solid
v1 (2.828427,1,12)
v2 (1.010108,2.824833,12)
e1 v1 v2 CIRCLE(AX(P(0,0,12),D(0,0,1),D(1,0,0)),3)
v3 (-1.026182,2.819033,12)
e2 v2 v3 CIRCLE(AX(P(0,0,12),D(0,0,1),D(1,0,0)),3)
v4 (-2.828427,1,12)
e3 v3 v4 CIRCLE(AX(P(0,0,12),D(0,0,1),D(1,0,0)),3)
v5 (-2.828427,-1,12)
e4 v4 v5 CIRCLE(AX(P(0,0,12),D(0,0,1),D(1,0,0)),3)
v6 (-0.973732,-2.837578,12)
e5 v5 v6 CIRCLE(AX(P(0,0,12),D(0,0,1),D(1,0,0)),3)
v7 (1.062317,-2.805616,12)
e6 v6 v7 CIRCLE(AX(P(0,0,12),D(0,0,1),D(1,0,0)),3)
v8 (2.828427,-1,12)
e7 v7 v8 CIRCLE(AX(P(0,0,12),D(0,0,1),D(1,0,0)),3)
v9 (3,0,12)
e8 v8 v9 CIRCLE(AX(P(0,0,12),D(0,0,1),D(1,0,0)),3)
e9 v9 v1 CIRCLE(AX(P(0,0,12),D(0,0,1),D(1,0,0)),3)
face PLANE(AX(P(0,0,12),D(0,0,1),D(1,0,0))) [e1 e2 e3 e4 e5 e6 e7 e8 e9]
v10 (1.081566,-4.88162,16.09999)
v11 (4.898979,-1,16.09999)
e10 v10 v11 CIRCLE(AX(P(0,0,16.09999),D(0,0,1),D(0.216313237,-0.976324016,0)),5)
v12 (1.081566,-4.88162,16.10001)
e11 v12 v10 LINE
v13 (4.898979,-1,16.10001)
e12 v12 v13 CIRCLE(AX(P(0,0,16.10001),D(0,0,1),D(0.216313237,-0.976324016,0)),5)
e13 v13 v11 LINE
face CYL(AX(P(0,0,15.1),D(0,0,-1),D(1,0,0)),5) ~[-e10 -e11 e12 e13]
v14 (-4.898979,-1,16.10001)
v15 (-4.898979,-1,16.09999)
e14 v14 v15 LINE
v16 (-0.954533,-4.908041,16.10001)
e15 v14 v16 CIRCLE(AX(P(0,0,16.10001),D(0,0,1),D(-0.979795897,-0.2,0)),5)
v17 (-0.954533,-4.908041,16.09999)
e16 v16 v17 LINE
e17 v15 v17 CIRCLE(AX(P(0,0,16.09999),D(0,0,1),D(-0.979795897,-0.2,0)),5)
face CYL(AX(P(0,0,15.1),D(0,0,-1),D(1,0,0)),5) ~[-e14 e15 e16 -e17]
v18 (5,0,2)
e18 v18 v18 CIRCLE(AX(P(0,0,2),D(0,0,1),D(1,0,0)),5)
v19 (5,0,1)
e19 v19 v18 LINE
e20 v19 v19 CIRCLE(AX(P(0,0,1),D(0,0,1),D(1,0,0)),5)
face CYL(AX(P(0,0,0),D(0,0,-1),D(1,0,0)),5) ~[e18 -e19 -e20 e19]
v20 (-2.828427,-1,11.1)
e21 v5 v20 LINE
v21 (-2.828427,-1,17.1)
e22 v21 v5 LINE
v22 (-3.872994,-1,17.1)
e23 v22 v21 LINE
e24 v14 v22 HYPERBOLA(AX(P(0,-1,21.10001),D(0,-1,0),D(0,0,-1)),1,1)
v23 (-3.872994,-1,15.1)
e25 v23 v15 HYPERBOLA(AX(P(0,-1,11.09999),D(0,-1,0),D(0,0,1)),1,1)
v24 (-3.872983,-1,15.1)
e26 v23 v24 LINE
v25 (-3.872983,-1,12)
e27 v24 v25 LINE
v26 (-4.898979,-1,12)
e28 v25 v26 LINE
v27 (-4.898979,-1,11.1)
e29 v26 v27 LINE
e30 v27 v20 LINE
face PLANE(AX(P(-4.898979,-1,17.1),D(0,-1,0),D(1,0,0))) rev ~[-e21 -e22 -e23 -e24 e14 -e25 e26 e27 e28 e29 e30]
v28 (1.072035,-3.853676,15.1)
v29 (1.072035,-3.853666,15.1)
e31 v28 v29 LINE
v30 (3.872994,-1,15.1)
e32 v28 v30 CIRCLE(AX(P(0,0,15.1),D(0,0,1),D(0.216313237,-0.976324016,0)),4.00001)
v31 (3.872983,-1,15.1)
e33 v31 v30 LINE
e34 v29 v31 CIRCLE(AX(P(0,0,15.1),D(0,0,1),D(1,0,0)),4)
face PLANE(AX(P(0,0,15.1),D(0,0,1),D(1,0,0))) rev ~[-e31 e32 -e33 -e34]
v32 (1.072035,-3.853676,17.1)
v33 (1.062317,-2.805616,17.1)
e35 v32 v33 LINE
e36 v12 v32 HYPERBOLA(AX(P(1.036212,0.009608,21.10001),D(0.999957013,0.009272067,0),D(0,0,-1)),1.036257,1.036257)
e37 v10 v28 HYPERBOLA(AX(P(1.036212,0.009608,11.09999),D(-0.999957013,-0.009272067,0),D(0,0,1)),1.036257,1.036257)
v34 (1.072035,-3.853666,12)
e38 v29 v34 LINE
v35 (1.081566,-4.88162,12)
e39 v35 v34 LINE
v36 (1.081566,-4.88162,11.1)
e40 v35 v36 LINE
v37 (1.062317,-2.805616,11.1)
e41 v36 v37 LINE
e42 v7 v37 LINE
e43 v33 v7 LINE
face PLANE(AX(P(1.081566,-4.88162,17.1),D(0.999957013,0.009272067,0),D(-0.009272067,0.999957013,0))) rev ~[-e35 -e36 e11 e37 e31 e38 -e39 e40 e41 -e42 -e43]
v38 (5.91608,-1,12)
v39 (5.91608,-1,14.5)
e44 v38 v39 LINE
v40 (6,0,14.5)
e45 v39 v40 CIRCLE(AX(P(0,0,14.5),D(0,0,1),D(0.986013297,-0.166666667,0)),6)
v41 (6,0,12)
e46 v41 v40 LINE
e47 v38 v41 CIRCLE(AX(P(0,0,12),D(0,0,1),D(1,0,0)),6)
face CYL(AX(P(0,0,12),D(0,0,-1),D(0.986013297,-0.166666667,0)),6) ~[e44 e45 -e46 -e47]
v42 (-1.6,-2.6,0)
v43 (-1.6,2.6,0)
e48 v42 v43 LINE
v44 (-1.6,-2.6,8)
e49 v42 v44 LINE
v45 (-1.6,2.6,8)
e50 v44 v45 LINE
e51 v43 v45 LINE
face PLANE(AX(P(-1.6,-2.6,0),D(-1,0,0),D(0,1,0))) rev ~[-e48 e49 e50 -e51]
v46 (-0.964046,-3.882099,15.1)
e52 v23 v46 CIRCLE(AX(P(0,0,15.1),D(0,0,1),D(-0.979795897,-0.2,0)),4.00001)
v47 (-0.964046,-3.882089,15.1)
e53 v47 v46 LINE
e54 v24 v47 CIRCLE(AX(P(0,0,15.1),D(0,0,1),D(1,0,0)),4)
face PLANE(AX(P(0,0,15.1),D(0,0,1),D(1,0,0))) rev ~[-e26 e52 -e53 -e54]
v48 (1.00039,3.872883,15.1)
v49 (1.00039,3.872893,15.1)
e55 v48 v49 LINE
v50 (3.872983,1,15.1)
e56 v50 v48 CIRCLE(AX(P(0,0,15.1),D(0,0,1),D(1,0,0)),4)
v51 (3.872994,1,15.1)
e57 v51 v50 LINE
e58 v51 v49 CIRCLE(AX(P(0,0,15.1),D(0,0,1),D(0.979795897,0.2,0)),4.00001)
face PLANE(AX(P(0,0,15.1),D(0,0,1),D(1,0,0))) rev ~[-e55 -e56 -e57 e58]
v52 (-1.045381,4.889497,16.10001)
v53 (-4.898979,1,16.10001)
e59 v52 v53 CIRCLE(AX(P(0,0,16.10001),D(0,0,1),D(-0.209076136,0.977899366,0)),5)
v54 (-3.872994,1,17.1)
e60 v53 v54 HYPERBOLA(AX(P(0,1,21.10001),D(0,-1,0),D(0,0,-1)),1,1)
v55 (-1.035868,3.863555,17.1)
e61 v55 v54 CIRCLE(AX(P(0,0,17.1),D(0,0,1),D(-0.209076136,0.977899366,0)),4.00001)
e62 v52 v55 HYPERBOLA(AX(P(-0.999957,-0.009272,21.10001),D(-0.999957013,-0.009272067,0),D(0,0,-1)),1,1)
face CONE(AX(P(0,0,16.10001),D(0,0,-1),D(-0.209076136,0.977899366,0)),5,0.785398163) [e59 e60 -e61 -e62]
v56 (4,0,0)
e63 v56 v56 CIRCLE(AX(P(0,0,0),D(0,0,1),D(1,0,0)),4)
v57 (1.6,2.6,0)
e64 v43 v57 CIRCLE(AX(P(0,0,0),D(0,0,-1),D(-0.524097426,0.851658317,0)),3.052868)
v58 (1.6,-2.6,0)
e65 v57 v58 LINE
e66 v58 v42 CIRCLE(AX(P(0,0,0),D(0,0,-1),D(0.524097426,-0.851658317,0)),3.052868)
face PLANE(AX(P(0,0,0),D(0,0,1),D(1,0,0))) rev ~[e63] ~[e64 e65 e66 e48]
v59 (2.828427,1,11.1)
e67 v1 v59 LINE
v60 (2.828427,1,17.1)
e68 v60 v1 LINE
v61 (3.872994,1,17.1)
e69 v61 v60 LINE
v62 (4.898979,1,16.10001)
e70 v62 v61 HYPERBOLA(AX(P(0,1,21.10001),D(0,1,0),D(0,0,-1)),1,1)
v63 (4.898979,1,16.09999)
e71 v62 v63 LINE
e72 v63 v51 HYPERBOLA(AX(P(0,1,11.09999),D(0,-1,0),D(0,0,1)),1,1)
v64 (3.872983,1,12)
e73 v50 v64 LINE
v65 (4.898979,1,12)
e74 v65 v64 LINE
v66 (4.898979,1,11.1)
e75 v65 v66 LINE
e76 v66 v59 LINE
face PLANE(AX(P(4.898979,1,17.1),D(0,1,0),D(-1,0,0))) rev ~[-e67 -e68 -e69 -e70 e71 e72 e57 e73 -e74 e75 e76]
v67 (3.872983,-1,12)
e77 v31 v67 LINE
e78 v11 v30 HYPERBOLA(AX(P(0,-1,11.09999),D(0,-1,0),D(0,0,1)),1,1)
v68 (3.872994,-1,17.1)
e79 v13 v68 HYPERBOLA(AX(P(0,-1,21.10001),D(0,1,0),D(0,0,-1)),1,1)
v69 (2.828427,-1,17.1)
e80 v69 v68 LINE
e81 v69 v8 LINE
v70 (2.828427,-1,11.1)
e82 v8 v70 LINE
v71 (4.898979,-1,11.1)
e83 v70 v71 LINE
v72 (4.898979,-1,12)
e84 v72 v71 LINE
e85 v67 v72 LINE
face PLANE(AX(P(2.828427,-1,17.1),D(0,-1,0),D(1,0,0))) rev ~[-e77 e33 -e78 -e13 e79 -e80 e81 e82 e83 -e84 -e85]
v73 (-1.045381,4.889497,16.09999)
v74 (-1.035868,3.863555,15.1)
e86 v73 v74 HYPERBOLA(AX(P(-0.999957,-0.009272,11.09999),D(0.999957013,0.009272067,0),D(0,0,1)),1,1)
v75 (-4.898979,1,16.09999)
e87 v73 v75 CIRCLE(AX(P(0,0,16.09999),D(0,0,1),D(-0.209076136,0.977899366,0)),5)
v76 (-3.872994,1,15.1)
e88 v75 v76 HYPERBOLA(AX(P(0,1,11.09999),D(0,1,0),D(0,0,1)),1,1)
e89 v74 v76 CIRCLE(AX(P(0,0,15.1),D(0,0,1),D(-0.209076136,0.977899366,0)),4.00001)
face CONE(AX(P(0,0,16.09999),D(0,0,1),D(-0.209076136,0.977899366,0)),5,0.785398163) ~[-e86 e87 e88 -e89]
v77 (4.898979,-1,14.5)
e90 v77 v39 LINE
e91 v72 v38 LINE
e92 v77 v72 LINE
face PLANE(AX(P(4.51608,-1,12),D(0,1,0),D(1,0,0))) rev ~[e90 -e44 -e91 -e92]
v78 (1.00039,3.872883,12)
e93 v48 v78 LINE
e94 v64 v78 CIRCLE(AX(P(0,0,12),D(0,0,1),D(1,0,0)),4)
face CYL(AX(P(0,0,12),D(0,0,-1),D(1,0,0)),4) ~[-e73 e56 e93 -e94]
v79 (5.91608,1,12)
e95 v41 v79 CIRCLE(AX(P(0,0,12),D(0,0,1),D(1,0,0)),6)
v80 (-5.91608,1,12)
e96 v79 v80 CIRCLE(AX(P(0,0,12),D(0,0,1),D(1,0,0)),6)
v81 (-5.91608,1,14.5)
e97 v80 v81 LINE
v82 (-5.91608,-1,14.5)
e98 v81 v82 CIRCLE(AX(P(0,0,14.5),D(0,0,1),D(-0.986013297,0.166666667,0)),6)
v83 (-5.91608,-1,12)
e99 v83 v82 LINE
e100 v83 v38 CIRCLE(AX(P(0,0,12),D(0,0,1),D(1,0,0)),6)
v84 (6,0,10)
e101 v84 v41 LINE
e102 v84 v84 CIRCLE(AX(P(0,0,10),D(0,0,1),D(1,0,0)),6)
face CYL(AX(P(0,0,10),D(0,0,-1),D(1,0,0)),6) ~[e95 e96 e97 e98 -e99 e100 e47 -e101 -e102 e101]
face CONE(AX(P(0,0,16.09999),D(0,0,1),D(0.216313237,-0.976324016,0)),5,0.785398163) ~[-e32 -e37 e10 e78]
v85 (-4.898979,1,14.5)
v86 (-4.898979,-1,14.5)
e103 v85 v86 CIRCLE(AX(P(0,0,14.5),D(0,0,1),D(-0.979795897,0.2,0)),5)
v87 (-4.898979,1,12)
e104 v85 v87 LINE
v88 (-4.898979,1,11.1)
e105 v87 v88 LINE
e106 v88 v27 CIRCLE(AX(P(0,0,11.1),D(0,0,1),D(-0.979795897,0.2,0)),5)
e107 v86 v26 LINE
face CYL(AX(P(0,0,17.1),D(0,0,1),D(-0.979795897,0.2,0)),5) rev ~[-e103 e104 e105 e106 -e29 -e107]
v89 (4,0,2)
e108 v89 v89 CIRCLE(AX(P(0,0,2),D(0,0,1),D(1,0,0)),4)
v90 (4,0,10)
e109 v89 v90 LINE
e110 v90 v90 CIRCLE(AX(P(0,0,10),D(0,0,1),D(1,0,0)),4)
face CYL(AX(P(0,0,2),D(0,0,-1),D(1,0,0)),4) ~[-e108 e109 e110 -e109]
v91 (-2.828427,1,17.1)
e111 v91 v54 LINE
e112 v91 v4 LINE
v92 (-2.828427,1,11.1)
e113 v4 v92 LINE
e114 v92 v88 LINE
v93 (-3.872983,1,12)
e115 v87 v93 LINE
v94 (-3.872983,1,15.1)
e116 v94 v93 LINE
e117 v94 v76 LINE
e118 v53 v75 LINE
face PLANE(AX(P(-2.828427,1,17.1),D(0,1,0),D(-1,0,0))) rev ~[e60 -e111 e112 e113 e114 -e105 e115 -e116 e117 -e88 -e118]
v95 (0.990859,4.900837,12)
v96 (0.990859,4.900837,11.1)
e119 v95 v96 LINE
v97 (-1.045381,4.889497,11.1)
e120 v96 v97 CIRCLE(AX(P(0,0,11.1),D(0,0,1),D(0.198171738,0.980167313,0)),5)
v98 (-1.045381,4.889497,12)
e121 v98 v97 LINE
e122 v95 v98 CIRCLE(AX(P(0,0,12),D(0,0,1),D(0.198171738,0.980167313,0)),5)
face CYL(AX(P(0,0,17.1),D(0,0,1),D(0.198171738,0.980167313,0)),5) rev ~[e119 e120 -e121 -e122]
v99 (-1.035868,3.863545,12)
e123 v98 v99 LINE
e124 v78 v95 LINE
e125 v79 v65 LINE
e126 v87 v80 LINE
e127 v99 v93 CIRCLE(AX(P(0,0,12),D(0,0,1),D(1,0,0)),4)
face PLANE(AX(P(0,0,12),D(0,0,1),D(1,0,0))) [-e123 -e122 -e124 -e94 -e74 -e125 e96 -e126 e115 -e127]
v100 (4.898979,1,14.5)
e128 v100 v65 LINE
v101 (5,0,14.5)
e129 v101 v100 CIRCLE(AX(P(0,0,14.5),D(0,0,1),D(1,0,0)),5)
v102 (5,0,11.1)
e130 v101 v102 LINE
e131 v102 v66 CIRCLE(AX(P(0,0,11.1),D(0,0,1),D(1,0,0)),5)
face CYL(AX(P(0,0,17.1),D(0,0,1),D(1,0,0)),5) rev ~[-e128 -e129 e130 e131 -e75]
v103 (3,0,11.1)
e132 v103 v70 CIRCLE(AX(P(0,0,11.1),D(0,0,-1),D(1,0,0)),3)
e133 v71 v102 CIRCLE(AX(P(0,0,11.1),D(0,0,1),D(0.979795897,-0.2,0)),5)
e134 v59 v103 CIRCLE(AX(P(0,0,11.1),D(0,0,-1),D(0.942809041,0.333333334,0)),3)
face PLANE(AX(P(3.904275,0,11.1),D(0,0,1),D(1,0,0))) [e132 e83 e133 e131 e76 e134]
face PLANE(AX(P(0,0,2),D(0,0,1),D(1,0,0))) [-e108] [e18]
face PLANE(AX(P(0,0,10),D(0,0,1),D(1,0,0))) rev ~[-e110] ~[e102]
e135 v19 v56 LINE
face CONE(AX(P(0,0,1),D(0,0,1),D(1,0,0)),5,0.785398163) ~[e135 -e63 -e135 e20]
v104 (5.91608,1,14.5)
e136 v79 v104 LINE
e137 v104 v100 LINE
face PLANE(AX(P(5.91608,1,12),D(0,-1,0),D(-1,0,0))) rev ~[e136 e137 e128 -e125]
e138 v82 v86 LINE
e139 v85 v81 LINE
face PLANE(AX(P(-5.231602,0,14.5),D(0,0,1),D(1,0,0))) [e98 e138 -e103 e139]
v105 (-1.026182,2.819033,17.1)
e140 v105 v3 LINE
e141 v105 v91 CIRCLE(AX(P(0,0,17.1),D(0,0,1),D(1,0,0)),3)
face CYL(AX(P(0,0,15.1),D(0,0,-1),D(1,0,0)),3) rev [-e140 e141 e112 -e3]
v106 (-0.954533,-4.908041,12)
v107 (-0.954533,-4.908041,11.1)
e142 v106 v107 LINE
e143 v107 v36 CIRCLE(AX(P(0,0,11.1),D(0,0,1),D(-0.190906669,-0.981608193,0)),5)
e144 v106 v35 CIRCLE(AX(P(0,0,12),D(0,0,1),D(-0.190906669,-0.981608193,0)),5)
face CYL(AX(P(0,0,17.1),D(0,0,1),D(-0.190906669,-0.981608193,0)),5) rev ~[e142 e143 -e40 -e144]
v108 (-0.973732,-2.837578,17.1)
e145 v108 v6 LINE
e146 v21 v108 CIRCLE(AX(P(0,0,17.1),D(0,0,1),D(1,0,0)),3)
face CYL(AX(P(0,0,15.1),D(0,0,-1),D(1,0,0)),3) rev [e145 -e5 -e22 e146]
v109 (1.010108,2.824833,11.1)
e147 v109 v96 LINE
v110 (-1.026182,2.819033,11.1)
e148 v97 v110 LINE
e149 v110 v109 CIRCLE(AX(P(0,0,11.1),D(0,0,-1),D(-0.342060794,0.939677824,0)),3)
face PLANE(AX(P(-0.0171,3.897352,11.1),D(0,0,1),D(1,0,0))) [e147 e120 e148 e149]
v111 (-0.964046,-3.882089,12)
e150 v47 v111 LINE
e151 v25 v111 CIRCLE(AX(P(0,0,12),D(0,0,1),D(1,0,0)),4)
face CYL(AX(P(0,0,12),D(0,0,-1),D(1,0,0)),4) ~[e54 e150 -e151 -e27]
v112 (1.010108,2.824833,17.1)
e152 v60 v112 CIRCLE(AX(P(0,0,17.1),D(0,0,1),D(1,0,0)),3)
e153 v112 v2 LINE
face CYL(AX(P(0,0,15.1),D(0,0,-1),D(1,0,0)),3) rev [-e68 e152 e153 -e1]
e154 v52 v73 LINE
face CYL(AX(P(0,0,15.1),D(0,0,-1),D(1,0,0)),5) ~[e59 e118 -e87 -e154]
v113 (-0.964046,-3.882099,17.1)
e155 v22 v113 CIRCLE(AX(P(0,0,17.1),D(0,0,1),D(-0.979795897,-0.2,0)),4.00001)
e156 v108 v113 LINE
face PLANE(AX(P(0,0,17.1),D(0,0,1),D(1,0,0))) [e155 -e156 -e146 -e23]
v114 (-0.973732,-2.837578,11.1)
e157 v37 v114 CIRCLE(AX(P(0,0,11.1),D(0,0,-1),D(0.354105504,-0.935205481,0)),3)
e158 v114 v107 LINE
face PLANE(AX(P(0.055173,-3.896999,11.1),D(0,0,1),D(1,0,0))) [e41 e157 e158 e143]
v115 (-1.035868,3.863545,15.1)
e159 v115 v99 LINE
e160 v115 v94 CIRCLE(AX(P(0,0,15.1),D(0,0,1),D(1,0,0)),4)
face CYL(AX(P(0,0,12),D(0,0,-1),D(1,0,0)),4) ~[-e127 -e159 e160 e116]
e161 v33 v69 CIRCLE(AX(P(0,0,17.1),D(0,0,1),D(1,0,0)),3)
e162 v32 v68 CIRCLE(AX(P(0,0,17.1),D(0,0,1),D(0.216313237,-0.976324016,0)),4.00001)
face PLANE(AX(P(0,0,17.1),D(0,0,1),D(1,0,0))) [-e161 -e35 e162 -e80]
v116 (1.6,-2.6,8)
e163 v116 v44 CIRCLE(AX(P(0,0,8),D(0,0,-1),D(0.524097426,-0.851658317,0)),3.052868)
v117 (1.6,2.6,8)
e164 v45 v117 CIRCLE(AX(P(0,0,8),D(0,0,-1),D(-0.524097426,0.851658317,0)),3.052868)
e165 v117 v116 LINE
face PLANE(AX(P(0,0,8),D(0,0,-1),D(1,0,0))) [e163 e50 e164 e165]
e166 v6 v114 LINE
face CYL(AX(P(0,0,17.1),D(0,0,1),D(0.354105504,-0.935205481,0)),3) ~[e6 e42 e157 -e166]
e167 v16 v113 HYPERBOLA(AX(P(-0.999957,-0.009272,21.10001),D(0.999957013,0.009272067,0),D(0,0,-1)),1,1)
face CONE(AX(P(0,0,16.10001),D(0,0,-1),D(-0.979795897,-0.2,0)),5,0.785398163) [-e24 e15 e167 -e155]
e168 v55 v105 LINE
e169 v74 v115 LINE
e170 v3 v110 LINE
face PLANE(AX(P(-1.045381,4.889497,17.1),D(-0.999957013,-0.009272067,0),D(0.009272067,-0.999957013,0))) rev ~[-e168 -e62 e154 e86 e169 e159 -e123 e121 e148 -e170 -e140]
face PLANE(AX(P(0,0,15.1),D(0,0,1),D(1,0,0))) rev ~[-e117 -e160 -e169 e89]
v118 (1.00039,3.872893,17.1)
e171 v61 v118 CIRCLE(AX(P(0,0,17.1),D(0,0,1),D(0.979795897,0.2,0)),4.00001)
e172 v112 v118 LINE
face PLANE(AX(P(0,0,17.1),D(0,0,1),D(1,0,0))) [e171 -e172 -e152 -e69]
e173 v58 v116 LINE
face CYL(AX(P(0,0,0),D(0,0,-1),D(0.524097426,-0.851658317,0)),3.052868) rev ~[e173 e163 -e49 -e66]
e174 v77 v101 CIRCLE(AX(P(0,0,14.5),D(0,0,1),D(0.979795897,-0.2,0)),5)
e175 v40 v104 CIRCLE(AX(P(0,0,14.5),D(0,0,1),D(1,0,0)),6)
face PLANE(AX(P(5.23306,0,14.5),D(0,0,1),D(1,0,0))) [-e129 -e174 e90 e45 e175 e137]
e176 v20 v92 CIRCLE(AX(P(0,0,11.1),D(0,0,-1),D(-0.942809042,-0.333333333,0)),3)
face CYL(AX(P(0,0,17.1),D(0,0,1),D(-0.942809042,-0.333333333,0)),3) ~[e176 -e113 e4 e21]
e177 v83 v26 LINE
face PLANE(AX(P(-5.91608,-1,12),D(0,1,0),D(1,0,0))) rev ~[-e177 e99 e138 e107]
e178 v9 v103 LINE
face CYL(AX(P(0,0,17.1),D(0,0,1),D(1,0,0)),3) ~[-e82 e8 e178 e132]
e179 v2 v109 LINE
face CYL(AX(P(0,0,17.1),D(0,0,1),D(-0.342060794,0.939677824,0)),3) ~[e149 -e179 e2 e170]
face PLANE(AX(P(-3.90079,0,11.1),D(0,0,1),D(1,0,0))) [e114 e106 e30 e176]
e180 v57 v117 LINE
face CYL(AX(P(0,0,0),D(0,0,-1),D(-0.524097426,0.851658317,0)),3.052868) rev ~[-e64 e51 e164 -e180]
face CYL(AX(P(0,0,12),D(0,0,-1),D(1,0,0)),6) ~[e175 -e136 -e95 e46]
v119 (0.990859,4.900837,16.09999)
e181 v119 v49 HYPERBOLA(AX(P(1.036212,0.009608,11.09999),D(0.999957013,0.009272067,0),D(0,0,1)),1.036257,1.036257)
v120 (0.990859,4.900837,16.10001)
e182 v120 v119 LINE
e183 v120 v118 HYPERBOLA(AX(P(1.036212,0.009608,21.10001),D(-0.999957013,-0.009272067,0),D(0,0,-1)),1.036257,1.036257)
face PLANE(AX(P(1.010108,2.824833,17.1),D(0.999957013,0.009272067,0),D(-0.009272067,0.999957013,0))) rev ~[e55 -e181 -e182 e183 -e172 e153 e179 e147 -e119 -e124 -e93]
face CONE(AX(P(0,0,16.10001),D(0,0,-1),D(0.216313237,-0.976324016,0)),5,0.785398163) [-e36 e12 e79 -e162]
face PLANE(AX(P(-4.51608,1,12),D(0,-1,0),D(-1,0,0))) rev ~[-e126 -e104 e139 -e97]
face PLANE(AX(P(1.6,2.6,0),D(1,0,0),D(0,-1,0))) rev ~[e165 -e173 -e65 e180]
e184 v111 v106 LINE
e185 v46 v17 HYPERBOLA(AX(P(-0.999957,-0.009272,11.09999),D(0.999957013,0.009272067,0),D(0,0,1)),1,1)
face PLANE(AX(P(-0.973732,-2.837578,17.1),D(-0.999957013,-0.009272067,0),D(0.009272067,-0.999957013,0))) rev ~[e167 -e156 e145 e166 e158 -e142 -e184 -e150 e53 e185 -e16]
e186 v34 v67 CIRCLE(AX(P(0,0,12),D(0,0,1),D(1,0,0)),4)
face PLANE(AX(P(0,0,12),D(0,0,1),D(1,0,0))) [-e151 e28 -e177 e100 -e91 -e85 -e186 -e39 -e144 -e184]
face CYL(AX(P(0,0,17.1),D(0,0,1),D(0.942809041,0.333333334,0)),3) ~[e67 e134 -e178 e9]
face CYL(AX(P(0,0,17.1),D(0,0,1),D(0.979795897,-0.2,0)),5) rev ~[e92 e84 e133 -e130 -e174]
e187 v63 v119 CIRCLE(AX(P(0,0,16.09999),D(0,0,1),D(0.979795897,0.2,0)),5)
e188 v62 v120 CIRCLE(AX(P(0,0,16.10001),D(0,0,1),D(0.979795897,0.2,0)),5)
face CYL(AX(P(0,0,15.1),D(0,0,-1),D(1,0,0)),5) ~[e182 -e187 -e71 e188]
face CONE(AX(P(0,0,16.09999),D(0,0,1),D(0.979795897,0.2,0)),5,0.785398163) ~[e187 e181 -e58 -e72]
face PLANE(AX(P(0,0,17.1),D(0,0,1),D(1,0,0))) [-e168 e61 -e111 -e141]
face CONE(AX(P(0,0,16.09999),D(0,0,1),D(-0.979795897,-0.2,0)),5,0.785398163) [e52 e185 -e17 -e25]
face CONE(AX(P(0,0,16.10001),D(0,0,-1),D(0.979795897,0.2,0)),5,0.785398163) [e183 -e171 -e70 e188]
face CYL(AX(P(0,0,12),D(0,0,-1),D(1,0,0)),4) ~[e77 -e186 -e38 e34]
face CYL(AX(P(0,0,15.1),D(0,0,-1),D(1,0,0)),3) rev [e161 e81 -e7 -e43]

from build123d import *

# Parameters (mm, degrees)
F0_R      = 5
F1_DEPTH  = 2
F2_R      = 4
F3_DEPTH  = 8
F4_R      = 6
F5_DEPTH  = 2
F7_DEPTH  = 2.5
F10_DEPTH = 8
F11_SIZE  = 1
F8_R      = 4
F8_R_2    = 3
F12_DEPTH = 3.1
F13_R     = 5
F13_R_2   = 4
F13_R_3   = 3
F14_DEPTH = 2
F16_DEPTH = 6
F17_SIZE  = 0.99999


# Not quite as in the source:
# - a fillet or chamfer is up to 0.001 mm smaller than in the source, because OpenCascade refuses the exact size


with BuildPart() as f1:
    # F0 (on Top) → F1 (new body)
    with BuildSketch(Plane.XY):
        Circle(F0_R)
    extrude(amount=F1_DEPTH)

    # F2 (on face) → F3 (join)
    with BuildSketch(Plane.XY.offset(2)):
        Circle(F2_R)
    extrude(amount=F3_DEPTH)

    # F4 (on face) → F5 (join)
    with BuildSketch(Plane.XY.offset(10)):
        Circle(F4_R)
    extrude(amount=F5_DEPTH)

    # F6 (on face) → F7 (join)
    with BuildSketch(Plane.XY.offset(12)):
        with BuildLine():
            ThreePointArc((6, 0), (5.9789831367, 0.5017575617), (5.9160797831, 1))
            Line((5.9160797831, 1), (4.5160797831, 1))
            Line((4.5160797831, 1), (4.5160797831, -1))
            Line((4.5160797831, -1), (5.9160797831, -1))
            ThreePointArc((5.9160797831, -1), (5.9789831367, -0.5017575617), (6, 0))
        make_face()
        with BuildLine():
            Line((-4.5160797831, 1), (-5.9160797831, 1))
            ThreePointArc((-5.9160797831, 1), (-6, 0), (-5.9160797831, -1))
            Line((-5.9160797831, -1), (-4.5160797831, -1))
            Line((-4.5160797831, -1), (-4.5160797831, 1))
        make_face()
    extrude(amount=F7_DEPTH)

    # F9 (on face) → F10 (cut)
    with BuildSketch(Plane(origin=(0, 0, 0), x_dir=(1, 0, 0), z_dir=(0, 0, -1))):
        with BuildLine():
            ThreePointArc((1.6, 2.6), (0, 3.0528675045), (-1.6, 2.6))
            Line((-1.6, 2.6), (-1.6, -2.6))
            ThreePointArc((-1.6, -2.6), (0, -3.0528675045), (1.6, -2.6))
            Line((1.6, -2.6), (1.6, 2.6))
        make_face()
    extrude(amount=-F10_DEPTH, mode=Mode.SUBTRACT)

    # F11
    f11_edges = [f1.edges().sort_by_distance(p)[0] for p in [
        (-5, 0, 0),
    ]]
    chamfer(f11_edges, length=F11_SIZE)

    # F8 (on face) → F12 (join)
    with BuildSketch(Plane.XY.offset(12)):
        Circle(F8_R)
        Circle(F8_R_2, mode=Mode.SUBTRACT)
    extrude(amount=F12_DEPTH)

    # F13 (on face) → F14 (join)
    with BuildSketch(Plane.XY.offset(15.1)):
        Circle(F13_R)
        Circle(F13_R_2, mode=Mode.SUBTRACT)
        Circle(F13_R_2)
        Circle(F13_R_3, mode=Mode.SUBTRACT)
    extrude(amount=F14_DEPTH)

    # F15 (on face) → F16 (cut)
    with BuildSketch(Plane.XY.offset(17.1)):
        with BuildLine():
            Line((-2.8284271247, 1), (-4.8989794856, 1))
            ThreePointArc((-4.8989794856, 1), (-5, 0), (-4.8989794856, -1))
            Line((-4.8989794856, -1), (-2.8284271247, -1))
            ThreePointArc((-2.8284271247, -1), (-3, 0), (-2.8284271247, 1))
        make_face()
        with BuildLine():
            ThreePointArc((0.9908586892, 4.9008365672), (-0.0278443772, 4.9999224685), (-1.0453806817, 4.8894968279))
            Line((-1.0453806817, 4.8894968279), (-1.0261823806, 2.819033473))
            ThreePointArc((-1.0261823806, 2.819033473), (-0.0085441177, 2.999987833), (1.0101083624, 2.8248329324))
            Line((1.0101083624, 2.8248329324), (0.9908586892, 4.9008365672))
        make_face()
        with BuildLine():
            ThreePointArc((5, 0), (4.974680765, 0.50254481), (4.8989794856, 1))
            Line((4.8989794856, 1), (2.8284271247, 1))
            ThreePointArc((2.8284271247, 1), (2.956795679, 0.5073059362), (3, 0))
            ThreePointArc((3, 0), (2.956795679, -0.5073059362), (2.8284271247, -1))
            Line((2.8284271247, -1), (4.8989794856, -1))
            ThreePointArc((4.8989794856, -1), (4.974680765, -0.50254481), (5, 0))
        make_face()
        with BuildLine():
            Line((-0.9737316464, -2.8375776079), (-0.9545333452, -4.9080409628))
            ThreePointArc((-0.9545333452, -4.9080409628), (0.0648756616, -4.9995790971), (1.0815661863, -4.8816200779))
            Line((1.0815661863, -4.8816200779), (1.0623165131, -2.8056164431))
            ThreePointArc((1.0623165131, -2.8056164431), (0.0470871391, -2.9996304441), (-0.9737316464, -2.8375776079))
        make_face()
    extrude(amount=-F16_DEPTH, mode=Mode.SUBTRACT)

    # F17 (size 1 in the source; OpenCascade refuses exactly that, so slightly less here)
    f17_edges = [f1.edges().sort_by_distance(p)[0] for p in [
        (3.564895, -3.505927, 15.1),
        (-3.551887, 3.519105, 15.1),
        (-3.519105, -3.551887, 15.1),
        (3.564895, -3.505927, 17.1),
        (-3.519105, -3.551887, 17.1),
        (-3.551887, 3.519105, 17.1),
        (3.532234, 3.53883, 17.1),
        (3.532234, 3.53883, 15.1),
    ]]
    chamfer(f17_edges, length=F17_SIZE)


solid = f1.part
